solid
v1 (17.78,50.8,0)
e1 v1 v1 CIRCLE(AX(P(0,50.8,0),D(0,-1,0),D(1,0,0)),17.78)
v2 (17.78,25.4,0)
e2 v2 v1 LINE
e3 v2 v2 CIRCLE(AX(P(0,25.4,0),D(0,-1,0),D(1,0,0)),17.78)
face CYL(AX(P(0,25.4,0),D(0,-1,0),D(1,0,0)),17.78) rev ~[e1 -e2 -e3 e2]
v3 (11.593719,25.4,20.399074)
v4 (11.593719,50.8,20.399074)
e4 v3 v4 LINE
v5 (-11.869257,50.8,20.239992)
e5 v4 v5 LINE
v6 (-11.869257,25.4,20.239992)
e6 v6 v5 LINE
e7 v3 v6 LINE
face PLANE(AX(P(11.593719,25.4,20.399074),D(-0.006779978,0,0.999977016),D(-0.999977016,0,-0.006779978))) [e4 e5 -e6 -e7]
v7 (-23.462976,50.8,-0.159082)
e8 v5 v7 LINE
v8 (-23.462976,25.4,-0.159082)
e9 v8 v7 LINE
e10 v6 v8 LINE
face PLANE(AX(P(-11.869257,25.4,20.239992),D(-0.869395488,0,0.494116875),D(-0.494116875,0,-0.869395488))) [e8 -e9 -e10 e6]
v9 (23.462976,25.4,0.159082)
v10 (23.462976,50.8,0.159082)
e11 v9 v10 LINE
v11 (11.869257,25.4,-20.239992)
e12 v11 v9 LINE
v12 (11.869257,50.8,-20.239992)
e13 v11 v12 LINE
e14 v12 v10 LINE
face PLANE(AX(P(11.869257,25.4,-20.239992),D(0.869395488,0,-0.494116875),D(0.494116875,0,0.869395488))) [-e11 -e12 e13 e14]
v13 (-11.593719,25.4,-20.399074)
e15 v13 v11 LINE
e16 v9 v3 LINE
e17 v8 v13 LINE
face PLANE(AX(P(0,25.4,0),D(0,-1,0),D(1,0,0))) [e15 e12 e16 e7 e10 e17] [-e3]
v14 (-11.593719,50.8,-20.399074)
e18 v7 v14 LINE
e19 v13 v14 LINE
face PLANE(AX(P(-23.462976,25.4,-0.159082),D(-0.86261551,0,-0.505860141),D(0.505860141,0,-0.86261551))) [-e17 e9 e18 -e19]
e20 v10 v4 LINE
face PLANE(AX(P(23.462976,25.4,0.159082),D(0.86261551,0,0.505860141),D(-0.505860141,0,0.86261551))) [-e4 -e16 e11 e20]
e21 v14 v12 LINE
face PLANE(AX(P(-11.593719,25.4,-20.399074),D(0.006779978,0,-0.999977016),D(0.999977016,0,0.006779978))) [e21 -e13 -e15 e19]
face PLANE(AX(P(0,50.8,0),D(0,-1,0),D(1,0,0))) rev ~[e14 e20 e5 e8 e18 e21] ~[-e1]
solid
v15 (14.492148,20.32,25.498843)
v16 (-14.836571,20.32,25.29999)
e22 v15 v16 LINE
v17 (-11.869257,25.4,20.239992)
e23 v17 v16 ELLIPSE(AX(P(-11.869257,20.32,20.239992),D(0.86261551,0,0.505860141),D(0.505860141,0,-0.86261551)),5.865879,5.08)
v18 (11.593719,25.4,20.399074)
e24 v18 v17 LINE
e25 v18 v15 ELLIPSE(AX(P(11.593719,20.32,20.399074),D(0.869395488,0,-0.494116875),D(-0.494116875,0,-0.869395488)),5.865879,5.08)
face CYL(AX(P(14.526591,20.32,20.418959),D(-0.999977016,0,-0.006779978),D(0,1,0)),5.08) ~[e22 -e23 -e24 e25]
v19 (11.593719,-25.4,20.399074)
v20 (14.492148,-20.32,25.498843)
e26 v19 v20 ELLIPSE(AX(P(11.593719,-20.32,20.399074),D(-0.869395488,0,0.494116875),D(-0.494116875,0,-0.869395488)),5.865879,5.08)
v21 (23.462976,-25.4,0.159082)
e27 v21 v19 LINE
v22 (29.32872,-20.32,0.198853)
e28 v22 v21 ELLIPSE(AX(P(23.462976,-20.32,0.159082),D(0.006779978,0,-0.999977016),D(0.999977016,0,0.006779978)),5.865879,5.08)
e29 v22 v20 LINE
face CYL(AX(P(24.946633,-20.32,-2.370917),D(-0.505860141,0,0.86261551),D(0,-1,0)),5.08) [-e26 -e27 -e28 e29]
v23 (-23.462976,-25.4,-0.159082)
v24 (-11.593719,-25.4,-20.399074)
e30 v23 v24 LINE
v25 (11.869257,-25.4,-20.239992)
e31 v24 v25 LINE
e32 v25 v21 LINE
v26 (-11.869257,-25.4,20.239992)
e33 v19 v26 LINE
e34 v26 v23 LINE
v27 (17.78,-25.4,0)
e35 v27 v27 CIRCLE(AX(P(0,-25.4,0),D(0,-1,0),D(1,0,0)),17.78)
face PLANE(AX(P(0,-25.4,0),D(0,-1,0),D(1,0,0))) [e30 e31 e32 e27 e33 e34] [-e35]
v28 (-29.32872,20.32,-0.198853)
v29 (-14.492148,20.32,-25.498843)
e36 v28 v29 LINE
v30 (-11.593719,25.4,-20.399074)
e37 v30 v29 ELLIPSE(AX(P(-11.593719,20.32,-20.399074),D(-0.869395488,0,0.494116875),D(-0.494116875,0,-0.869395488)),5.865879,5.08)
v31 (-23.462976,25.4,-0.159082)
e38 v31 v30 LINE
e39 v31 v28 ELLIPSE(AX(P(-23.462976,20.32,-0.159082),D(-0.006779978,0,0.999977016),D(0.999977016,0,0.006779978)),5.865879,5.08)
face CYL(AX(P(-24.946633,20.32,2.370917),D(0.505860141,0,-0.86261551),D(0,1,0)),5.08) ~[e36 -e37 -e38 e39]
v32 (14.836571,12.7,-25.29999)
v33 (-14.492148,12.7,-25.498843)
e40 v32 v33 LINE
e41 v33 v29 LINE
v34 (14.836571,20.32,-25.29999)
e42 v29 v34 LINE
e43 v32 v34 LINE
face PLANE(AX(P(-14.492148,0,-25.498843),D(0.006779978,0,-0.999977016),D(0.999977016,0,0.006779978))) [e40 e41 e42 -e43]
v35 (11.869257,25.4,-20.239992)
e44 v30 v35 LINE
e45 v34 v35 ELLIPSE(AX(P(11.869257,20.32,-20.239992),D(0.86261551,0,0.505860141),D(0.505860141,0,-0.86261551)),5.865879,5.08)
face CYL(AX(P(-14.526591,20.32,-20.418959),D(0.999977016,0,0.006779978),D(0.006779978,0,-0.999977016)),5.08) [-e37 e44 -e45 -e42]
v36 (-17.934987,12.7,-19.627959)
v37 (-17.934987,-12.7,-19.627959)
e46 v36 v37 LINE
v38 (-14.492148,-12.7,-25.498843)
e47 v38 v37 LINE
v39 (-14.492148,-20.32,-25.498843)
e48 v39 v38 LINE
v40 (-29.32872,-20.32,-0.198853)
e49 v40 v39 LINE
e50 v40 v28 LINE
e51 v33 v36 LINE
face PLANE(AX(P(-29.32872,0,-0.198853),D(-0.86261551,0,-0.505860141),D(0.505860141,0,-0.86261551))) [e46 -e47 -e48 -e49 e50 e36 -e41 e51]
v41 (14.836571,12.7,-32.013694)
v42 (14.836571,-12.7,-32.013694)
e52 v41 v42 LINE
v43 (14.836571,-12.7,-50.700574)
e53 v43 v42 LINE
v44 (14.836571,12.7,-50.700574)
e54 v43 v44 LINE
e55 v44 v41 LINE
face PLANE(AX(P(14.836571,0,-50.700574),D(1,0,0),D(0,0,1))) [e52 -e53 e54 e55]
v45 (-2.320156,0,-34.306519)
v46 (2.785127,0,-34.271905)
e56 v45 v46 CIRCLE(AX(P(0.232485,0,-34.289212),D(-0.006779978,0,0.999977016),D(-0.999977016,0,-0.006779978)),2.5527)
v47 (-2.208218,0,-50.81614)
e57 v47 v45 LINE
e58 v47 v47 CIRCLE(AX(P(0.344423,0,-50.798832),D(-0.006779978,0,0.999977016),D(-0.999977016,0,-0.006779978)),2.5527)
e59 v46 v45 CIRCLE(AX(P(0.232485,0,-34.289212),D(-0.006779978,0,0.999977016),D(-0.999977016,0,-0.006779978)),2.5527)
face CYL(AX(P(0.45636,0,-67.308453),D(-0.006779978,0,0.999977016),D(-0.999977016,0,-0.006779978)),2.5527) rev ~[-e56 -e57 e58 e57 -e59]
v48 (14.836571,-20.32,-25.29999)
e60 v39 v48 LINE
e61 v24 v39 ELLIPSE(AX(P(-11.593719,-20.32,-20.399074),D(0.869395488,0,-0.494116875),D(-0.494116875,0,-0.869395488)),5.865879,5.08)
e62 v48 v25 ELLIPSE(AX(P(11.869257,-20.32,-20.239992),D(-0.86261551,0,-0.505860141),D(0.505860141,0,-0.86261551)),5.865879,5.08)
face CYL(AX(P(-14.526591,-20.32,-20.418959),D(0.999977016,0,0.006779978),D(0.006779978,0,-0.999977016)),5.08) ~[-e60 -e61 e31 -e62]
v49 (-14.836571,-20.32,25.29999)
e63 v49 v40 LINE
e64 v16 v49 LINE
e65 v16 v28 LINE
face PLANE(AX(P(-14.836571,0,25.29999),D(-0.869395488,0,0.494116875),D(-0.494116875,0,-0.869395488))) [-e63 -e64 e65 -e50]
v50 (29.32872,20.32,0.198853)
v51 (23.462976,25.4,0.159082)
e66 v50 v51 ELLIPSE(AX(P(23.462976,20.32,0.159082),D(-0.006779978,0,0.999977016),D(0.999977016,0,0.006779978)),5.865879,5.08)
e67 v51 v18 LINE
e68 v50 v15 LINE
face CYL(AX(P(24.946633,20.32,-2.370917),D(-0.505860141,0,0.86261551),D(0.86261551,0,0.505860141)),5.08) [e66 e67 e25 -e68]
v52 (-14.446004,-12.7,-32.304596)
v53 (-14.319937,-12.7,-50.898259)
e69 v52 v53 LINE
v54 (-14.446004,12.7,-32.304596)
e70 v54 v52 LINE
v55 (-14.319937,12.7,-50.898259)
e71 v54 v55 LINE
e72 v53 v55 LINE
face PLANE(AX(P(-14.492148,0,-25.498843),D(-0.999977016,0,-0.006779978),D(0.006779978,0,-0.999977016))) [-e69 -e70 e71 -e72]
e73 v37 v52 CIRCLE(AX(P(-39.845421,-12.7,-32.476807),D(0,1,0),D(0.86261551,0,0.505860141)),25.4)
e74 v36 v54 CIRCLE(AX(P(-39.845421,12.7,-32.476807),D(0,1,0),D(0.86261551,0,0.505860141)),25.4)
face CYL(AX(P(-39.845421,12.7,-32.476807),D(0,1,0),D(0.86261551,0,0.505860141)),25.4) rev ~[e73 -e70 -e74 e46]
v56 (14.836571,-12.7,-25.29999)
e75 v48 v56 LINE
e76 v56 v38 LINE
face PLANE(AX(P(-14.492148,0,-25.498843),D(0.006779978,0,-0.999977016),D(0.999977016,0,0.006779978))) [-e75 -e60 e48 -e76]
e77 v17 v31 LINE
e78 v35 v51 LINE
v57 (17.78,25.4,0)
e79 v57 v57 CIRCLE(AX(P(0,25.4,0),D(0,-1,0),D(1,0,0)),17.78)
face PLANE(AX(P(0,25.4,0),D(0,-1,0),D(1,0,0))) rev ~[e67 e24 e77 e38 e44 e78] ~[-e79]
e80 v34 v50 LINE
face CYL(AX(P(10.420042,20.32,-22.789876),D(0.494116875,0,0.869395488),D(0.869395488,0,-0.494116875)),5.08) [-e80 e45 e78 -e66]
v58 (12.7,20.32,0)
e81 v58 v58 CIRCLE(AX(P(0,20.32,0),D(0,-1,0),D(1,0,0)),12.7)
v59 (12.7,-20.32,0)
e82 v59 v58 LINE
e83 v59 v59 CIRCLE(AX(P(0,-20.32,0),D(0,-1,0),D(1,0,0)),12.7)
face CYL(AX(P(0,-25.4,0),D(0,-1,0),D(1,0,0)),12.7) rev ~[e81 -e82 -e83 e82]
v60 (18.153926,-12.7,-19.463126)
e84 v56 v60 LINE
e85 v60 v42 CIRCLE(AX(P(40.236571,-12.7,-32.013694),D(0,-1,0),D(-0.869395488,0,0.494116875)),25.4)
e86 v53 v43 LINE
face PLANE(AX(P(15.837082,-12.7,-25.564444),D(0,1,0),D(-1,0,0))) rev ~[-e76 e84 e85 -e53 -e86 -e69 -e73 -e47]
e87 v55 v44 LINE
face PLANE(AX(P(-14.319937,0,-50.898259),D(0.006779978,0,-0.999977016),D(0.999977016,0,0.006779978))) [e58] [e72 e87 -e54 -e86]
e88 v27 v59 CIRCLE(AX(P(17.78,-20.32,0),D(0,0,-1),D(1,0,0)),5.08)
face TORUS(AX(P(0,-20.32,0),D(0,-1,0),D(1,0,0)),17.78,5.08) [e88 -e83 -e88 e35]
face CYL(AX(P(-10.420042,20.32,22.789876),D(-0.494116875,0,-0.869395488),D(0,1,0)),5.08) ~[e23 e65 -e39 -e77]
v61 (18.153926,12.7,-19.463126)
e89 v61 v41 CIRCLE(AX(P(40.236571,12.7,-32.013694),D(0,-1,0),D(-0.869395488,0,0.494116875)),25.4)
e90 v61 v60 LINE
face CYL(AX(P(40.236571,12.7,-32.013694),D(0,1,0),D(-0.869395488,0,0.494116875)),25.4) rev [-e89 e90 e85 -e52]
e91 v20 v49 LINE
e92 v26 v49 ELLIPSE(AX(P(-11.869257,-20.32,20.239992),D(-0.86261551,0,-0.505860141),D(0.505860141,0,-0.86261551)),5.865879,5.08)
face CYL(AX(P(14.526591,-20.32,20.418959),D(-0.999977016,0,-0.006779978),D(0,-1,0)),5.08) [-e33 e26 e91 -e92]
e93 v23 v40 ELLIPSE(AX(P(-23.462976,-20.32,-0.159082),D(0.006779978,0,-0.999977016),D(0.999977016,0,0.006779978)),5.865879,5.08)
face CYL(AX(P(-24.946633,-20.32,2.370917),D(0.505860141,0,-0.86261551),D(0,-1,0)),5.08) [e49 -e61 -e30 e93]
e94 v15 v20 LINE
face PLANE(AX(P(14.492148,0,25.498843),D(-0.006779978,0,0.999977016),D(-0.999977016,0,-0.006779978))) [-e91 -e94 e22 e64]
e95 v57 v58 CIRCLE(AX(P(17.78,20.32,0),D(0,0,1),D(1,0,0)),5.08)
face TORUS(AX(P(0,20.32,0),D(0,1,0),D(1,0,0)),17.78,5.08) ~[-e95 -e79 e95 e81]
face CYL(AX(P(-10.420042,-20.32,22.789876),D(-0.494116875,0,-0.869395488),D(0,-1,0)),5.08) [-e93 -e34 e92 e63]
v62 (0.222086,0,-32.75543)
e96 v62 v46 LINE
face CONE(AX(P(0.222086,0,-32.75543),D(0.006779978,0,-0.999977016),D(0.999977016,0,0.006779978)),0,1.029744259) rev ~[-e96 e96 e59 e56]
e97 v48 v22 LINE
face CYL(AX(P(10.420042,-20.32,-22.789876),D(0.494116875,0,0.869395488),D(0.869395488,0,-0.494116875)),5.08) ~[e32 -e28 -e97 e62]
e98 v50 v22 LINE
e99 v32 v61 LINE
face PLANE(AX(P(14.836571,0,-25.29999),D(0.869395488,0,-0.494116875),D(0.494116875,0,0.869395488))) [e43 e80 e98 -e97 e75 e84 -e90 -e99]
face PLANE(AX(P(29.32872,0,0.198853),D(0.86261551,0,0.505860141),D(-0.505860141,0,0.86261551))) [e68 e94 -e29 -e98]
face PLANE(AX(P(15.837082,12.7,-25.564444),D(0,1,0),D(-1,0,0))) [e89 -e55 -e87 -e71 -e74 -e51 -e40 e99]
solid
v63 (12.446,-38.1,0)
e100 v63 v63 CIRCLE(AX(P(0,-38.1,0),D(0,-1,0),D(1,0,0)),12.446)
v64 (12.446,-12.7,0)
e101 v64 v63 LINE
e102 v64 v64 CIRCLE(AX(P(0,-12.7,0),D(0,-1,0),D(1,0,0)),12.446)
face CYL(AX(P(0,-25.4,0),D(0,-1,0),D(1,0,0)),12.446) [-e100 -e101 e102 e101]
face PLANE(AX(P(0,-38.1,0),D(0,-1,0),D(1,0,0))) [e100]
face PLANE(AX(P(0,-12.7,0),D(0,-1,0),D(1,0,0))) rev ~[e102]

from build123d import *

# Parameters (mm, degrees)
F1_DEPTH    = 25.4
F2_DEPTH    = 12.7
F3_T1_DEPTH = 25.4
F4_R        = 12.7
F5_DEPTH    = 50.801
F6_R        = 5.08
F8_D        = 5.1054
F8_DEPTH    = 16.51
F8_TIP      = 1.5338169022
F9_DEPTH    = 25.4
F10_R       = 12.446
F11_DEPTH   = 12.7


# Not quite as in the source:
# - a fillet or chamfer that OpenCascade refuses, or shapes differently, is made with other operations: its cross-section is extruded or revolved along the edge and cut away or added


with BuildPart() as f1:
    # F0 (on Front) → F1 (new body, symmetric)
    with BuildSketch(Plane.XZ):
        Polygon((14.8365712132, -25.2999898808), (29.3287195589, 0.1988526353), (14.4921483457, 25.4988425161), (-14.8365712132, 25.2999898808), (-29.3287195589, -0.1988526353), (-14.4921483457, -25.4988425161), align=None)
    extrude(amount=F1_DEPTH, both=True)

    # F0 (on Front) → F2 (join, symmetric)
    with BuildSketch(Plane.XZ):
        Polygon((14.8365712132, -50.7005736958), (14.8365712132, -25.2999898808), (-14.4921483457, -25.4988425161), (-14.3199369119, -50.8982587146), align=None)
    extrude(amount=F2_DEPTH, both=True)

    # F3: fillet of radius 25.4 on 6 edges, made by hand

    # F3_s2 → F3_t1 (join)
    with BuildSketch(Plane.XZ.offset(-12.7)):
        with BuildLine():
            ThreePointArc((18.1539258272, -19.463125611), (15.6799102756, -25.5229004766), (14.8365712132, -32.0136942337))
            Line((14.8365712132, -32.0136942337), (14.8365712132, -25.2999898808))
            Line((14.8365712132, -25.2999898808), (18.1539258272, -19.463125611))
        make_face()
        with BuildLine():
            ThreePointArc((-17.9349866772, -19.6279594328), (-15.3560401496, -25.7366108904), (-14.446004431, -32.3045955747))
            Line((-14.446004431, -32.3045955747), (-14.4921483457, -25.4988425161))
            Line((-14.4921483457, -25.4988425161), (-17.9349866772, -19.6279594328))
        make_face()
    extrude(amount=F3_T1_DEPTH)

    # F4 (on face) → F5 (cut, through all)
    with BuildSketch(Plane.XZ.offset(25.4)):
        Circle(F4_R)
    extrude(amount=-F5_DEPTH, mode=Mode.SUBTRACT)

    # F6
    f6_edges = [f1.edges().sort_by_distance(p)[0] for p in [
        (-21.910434, -25.4, -12.848848),
        (-22.082645, -25.4, 12.550569),
        (0.172211, -25.4, -25.399416),
        (-0.172211, -25.4, 25.399416),
        (22.082645, -25.4, -12.550569),
        (21.910434, -25.4, 12.848848),
        (-12.7, -25.4, 0),
        (-21.910434, 25.4, -12.848848),
        (-22.082645, 25.4, 12.550569),
        (0.172211, 25.4, -25.399416),
        (-0.172211, 25.4, 25.399416),
        (22.082645, 25.4, -12.550569),
        (21.910434, 25.4, 12.848848),
        (-12.7, 25.4, 0),
    ]]
    fillet(f6_edges, radius=F6_R)

    # F8
    with Locations(Plane(origin=(0.3444228676, 0, -50.7988323969), x_dir=(0.9999770157, 0, 0.0067799777), z_dir=(0.0067799777, 0, -0.9999770157))):
        with Locations((0, 0)):
            Hole(F8_D / 2, depth=F8_DEPTH)
            with Locations((0, 0, -(F8_DEPTH + F8_TIP / 2))):  # 118° drill point
                Cone(0, F8_D / 2, F8_TIP, mode=Mode.SUBTRACT)


with BuildPart() as f9:
    # F9 (new): a face of the model
    f9_faces = [f1.part.faces().sort_by_distance(p)[0] for p in [
        (-16.9919602561, 25.4, -9.9645268468),
    ]]
    extrude(f9_faces, amount=F9_DEPTH)


with BuildPart() as f11:
    # F10 (on face) → F11 (new body, symmetric)
    with BuildSketch(Plane.XZ.offset(25.4)):
        Circle(F10_R)
    extrude(amount=F11_DEPTH, both=True)


solid = Compound([f1.part, f9.part, f11.part])
